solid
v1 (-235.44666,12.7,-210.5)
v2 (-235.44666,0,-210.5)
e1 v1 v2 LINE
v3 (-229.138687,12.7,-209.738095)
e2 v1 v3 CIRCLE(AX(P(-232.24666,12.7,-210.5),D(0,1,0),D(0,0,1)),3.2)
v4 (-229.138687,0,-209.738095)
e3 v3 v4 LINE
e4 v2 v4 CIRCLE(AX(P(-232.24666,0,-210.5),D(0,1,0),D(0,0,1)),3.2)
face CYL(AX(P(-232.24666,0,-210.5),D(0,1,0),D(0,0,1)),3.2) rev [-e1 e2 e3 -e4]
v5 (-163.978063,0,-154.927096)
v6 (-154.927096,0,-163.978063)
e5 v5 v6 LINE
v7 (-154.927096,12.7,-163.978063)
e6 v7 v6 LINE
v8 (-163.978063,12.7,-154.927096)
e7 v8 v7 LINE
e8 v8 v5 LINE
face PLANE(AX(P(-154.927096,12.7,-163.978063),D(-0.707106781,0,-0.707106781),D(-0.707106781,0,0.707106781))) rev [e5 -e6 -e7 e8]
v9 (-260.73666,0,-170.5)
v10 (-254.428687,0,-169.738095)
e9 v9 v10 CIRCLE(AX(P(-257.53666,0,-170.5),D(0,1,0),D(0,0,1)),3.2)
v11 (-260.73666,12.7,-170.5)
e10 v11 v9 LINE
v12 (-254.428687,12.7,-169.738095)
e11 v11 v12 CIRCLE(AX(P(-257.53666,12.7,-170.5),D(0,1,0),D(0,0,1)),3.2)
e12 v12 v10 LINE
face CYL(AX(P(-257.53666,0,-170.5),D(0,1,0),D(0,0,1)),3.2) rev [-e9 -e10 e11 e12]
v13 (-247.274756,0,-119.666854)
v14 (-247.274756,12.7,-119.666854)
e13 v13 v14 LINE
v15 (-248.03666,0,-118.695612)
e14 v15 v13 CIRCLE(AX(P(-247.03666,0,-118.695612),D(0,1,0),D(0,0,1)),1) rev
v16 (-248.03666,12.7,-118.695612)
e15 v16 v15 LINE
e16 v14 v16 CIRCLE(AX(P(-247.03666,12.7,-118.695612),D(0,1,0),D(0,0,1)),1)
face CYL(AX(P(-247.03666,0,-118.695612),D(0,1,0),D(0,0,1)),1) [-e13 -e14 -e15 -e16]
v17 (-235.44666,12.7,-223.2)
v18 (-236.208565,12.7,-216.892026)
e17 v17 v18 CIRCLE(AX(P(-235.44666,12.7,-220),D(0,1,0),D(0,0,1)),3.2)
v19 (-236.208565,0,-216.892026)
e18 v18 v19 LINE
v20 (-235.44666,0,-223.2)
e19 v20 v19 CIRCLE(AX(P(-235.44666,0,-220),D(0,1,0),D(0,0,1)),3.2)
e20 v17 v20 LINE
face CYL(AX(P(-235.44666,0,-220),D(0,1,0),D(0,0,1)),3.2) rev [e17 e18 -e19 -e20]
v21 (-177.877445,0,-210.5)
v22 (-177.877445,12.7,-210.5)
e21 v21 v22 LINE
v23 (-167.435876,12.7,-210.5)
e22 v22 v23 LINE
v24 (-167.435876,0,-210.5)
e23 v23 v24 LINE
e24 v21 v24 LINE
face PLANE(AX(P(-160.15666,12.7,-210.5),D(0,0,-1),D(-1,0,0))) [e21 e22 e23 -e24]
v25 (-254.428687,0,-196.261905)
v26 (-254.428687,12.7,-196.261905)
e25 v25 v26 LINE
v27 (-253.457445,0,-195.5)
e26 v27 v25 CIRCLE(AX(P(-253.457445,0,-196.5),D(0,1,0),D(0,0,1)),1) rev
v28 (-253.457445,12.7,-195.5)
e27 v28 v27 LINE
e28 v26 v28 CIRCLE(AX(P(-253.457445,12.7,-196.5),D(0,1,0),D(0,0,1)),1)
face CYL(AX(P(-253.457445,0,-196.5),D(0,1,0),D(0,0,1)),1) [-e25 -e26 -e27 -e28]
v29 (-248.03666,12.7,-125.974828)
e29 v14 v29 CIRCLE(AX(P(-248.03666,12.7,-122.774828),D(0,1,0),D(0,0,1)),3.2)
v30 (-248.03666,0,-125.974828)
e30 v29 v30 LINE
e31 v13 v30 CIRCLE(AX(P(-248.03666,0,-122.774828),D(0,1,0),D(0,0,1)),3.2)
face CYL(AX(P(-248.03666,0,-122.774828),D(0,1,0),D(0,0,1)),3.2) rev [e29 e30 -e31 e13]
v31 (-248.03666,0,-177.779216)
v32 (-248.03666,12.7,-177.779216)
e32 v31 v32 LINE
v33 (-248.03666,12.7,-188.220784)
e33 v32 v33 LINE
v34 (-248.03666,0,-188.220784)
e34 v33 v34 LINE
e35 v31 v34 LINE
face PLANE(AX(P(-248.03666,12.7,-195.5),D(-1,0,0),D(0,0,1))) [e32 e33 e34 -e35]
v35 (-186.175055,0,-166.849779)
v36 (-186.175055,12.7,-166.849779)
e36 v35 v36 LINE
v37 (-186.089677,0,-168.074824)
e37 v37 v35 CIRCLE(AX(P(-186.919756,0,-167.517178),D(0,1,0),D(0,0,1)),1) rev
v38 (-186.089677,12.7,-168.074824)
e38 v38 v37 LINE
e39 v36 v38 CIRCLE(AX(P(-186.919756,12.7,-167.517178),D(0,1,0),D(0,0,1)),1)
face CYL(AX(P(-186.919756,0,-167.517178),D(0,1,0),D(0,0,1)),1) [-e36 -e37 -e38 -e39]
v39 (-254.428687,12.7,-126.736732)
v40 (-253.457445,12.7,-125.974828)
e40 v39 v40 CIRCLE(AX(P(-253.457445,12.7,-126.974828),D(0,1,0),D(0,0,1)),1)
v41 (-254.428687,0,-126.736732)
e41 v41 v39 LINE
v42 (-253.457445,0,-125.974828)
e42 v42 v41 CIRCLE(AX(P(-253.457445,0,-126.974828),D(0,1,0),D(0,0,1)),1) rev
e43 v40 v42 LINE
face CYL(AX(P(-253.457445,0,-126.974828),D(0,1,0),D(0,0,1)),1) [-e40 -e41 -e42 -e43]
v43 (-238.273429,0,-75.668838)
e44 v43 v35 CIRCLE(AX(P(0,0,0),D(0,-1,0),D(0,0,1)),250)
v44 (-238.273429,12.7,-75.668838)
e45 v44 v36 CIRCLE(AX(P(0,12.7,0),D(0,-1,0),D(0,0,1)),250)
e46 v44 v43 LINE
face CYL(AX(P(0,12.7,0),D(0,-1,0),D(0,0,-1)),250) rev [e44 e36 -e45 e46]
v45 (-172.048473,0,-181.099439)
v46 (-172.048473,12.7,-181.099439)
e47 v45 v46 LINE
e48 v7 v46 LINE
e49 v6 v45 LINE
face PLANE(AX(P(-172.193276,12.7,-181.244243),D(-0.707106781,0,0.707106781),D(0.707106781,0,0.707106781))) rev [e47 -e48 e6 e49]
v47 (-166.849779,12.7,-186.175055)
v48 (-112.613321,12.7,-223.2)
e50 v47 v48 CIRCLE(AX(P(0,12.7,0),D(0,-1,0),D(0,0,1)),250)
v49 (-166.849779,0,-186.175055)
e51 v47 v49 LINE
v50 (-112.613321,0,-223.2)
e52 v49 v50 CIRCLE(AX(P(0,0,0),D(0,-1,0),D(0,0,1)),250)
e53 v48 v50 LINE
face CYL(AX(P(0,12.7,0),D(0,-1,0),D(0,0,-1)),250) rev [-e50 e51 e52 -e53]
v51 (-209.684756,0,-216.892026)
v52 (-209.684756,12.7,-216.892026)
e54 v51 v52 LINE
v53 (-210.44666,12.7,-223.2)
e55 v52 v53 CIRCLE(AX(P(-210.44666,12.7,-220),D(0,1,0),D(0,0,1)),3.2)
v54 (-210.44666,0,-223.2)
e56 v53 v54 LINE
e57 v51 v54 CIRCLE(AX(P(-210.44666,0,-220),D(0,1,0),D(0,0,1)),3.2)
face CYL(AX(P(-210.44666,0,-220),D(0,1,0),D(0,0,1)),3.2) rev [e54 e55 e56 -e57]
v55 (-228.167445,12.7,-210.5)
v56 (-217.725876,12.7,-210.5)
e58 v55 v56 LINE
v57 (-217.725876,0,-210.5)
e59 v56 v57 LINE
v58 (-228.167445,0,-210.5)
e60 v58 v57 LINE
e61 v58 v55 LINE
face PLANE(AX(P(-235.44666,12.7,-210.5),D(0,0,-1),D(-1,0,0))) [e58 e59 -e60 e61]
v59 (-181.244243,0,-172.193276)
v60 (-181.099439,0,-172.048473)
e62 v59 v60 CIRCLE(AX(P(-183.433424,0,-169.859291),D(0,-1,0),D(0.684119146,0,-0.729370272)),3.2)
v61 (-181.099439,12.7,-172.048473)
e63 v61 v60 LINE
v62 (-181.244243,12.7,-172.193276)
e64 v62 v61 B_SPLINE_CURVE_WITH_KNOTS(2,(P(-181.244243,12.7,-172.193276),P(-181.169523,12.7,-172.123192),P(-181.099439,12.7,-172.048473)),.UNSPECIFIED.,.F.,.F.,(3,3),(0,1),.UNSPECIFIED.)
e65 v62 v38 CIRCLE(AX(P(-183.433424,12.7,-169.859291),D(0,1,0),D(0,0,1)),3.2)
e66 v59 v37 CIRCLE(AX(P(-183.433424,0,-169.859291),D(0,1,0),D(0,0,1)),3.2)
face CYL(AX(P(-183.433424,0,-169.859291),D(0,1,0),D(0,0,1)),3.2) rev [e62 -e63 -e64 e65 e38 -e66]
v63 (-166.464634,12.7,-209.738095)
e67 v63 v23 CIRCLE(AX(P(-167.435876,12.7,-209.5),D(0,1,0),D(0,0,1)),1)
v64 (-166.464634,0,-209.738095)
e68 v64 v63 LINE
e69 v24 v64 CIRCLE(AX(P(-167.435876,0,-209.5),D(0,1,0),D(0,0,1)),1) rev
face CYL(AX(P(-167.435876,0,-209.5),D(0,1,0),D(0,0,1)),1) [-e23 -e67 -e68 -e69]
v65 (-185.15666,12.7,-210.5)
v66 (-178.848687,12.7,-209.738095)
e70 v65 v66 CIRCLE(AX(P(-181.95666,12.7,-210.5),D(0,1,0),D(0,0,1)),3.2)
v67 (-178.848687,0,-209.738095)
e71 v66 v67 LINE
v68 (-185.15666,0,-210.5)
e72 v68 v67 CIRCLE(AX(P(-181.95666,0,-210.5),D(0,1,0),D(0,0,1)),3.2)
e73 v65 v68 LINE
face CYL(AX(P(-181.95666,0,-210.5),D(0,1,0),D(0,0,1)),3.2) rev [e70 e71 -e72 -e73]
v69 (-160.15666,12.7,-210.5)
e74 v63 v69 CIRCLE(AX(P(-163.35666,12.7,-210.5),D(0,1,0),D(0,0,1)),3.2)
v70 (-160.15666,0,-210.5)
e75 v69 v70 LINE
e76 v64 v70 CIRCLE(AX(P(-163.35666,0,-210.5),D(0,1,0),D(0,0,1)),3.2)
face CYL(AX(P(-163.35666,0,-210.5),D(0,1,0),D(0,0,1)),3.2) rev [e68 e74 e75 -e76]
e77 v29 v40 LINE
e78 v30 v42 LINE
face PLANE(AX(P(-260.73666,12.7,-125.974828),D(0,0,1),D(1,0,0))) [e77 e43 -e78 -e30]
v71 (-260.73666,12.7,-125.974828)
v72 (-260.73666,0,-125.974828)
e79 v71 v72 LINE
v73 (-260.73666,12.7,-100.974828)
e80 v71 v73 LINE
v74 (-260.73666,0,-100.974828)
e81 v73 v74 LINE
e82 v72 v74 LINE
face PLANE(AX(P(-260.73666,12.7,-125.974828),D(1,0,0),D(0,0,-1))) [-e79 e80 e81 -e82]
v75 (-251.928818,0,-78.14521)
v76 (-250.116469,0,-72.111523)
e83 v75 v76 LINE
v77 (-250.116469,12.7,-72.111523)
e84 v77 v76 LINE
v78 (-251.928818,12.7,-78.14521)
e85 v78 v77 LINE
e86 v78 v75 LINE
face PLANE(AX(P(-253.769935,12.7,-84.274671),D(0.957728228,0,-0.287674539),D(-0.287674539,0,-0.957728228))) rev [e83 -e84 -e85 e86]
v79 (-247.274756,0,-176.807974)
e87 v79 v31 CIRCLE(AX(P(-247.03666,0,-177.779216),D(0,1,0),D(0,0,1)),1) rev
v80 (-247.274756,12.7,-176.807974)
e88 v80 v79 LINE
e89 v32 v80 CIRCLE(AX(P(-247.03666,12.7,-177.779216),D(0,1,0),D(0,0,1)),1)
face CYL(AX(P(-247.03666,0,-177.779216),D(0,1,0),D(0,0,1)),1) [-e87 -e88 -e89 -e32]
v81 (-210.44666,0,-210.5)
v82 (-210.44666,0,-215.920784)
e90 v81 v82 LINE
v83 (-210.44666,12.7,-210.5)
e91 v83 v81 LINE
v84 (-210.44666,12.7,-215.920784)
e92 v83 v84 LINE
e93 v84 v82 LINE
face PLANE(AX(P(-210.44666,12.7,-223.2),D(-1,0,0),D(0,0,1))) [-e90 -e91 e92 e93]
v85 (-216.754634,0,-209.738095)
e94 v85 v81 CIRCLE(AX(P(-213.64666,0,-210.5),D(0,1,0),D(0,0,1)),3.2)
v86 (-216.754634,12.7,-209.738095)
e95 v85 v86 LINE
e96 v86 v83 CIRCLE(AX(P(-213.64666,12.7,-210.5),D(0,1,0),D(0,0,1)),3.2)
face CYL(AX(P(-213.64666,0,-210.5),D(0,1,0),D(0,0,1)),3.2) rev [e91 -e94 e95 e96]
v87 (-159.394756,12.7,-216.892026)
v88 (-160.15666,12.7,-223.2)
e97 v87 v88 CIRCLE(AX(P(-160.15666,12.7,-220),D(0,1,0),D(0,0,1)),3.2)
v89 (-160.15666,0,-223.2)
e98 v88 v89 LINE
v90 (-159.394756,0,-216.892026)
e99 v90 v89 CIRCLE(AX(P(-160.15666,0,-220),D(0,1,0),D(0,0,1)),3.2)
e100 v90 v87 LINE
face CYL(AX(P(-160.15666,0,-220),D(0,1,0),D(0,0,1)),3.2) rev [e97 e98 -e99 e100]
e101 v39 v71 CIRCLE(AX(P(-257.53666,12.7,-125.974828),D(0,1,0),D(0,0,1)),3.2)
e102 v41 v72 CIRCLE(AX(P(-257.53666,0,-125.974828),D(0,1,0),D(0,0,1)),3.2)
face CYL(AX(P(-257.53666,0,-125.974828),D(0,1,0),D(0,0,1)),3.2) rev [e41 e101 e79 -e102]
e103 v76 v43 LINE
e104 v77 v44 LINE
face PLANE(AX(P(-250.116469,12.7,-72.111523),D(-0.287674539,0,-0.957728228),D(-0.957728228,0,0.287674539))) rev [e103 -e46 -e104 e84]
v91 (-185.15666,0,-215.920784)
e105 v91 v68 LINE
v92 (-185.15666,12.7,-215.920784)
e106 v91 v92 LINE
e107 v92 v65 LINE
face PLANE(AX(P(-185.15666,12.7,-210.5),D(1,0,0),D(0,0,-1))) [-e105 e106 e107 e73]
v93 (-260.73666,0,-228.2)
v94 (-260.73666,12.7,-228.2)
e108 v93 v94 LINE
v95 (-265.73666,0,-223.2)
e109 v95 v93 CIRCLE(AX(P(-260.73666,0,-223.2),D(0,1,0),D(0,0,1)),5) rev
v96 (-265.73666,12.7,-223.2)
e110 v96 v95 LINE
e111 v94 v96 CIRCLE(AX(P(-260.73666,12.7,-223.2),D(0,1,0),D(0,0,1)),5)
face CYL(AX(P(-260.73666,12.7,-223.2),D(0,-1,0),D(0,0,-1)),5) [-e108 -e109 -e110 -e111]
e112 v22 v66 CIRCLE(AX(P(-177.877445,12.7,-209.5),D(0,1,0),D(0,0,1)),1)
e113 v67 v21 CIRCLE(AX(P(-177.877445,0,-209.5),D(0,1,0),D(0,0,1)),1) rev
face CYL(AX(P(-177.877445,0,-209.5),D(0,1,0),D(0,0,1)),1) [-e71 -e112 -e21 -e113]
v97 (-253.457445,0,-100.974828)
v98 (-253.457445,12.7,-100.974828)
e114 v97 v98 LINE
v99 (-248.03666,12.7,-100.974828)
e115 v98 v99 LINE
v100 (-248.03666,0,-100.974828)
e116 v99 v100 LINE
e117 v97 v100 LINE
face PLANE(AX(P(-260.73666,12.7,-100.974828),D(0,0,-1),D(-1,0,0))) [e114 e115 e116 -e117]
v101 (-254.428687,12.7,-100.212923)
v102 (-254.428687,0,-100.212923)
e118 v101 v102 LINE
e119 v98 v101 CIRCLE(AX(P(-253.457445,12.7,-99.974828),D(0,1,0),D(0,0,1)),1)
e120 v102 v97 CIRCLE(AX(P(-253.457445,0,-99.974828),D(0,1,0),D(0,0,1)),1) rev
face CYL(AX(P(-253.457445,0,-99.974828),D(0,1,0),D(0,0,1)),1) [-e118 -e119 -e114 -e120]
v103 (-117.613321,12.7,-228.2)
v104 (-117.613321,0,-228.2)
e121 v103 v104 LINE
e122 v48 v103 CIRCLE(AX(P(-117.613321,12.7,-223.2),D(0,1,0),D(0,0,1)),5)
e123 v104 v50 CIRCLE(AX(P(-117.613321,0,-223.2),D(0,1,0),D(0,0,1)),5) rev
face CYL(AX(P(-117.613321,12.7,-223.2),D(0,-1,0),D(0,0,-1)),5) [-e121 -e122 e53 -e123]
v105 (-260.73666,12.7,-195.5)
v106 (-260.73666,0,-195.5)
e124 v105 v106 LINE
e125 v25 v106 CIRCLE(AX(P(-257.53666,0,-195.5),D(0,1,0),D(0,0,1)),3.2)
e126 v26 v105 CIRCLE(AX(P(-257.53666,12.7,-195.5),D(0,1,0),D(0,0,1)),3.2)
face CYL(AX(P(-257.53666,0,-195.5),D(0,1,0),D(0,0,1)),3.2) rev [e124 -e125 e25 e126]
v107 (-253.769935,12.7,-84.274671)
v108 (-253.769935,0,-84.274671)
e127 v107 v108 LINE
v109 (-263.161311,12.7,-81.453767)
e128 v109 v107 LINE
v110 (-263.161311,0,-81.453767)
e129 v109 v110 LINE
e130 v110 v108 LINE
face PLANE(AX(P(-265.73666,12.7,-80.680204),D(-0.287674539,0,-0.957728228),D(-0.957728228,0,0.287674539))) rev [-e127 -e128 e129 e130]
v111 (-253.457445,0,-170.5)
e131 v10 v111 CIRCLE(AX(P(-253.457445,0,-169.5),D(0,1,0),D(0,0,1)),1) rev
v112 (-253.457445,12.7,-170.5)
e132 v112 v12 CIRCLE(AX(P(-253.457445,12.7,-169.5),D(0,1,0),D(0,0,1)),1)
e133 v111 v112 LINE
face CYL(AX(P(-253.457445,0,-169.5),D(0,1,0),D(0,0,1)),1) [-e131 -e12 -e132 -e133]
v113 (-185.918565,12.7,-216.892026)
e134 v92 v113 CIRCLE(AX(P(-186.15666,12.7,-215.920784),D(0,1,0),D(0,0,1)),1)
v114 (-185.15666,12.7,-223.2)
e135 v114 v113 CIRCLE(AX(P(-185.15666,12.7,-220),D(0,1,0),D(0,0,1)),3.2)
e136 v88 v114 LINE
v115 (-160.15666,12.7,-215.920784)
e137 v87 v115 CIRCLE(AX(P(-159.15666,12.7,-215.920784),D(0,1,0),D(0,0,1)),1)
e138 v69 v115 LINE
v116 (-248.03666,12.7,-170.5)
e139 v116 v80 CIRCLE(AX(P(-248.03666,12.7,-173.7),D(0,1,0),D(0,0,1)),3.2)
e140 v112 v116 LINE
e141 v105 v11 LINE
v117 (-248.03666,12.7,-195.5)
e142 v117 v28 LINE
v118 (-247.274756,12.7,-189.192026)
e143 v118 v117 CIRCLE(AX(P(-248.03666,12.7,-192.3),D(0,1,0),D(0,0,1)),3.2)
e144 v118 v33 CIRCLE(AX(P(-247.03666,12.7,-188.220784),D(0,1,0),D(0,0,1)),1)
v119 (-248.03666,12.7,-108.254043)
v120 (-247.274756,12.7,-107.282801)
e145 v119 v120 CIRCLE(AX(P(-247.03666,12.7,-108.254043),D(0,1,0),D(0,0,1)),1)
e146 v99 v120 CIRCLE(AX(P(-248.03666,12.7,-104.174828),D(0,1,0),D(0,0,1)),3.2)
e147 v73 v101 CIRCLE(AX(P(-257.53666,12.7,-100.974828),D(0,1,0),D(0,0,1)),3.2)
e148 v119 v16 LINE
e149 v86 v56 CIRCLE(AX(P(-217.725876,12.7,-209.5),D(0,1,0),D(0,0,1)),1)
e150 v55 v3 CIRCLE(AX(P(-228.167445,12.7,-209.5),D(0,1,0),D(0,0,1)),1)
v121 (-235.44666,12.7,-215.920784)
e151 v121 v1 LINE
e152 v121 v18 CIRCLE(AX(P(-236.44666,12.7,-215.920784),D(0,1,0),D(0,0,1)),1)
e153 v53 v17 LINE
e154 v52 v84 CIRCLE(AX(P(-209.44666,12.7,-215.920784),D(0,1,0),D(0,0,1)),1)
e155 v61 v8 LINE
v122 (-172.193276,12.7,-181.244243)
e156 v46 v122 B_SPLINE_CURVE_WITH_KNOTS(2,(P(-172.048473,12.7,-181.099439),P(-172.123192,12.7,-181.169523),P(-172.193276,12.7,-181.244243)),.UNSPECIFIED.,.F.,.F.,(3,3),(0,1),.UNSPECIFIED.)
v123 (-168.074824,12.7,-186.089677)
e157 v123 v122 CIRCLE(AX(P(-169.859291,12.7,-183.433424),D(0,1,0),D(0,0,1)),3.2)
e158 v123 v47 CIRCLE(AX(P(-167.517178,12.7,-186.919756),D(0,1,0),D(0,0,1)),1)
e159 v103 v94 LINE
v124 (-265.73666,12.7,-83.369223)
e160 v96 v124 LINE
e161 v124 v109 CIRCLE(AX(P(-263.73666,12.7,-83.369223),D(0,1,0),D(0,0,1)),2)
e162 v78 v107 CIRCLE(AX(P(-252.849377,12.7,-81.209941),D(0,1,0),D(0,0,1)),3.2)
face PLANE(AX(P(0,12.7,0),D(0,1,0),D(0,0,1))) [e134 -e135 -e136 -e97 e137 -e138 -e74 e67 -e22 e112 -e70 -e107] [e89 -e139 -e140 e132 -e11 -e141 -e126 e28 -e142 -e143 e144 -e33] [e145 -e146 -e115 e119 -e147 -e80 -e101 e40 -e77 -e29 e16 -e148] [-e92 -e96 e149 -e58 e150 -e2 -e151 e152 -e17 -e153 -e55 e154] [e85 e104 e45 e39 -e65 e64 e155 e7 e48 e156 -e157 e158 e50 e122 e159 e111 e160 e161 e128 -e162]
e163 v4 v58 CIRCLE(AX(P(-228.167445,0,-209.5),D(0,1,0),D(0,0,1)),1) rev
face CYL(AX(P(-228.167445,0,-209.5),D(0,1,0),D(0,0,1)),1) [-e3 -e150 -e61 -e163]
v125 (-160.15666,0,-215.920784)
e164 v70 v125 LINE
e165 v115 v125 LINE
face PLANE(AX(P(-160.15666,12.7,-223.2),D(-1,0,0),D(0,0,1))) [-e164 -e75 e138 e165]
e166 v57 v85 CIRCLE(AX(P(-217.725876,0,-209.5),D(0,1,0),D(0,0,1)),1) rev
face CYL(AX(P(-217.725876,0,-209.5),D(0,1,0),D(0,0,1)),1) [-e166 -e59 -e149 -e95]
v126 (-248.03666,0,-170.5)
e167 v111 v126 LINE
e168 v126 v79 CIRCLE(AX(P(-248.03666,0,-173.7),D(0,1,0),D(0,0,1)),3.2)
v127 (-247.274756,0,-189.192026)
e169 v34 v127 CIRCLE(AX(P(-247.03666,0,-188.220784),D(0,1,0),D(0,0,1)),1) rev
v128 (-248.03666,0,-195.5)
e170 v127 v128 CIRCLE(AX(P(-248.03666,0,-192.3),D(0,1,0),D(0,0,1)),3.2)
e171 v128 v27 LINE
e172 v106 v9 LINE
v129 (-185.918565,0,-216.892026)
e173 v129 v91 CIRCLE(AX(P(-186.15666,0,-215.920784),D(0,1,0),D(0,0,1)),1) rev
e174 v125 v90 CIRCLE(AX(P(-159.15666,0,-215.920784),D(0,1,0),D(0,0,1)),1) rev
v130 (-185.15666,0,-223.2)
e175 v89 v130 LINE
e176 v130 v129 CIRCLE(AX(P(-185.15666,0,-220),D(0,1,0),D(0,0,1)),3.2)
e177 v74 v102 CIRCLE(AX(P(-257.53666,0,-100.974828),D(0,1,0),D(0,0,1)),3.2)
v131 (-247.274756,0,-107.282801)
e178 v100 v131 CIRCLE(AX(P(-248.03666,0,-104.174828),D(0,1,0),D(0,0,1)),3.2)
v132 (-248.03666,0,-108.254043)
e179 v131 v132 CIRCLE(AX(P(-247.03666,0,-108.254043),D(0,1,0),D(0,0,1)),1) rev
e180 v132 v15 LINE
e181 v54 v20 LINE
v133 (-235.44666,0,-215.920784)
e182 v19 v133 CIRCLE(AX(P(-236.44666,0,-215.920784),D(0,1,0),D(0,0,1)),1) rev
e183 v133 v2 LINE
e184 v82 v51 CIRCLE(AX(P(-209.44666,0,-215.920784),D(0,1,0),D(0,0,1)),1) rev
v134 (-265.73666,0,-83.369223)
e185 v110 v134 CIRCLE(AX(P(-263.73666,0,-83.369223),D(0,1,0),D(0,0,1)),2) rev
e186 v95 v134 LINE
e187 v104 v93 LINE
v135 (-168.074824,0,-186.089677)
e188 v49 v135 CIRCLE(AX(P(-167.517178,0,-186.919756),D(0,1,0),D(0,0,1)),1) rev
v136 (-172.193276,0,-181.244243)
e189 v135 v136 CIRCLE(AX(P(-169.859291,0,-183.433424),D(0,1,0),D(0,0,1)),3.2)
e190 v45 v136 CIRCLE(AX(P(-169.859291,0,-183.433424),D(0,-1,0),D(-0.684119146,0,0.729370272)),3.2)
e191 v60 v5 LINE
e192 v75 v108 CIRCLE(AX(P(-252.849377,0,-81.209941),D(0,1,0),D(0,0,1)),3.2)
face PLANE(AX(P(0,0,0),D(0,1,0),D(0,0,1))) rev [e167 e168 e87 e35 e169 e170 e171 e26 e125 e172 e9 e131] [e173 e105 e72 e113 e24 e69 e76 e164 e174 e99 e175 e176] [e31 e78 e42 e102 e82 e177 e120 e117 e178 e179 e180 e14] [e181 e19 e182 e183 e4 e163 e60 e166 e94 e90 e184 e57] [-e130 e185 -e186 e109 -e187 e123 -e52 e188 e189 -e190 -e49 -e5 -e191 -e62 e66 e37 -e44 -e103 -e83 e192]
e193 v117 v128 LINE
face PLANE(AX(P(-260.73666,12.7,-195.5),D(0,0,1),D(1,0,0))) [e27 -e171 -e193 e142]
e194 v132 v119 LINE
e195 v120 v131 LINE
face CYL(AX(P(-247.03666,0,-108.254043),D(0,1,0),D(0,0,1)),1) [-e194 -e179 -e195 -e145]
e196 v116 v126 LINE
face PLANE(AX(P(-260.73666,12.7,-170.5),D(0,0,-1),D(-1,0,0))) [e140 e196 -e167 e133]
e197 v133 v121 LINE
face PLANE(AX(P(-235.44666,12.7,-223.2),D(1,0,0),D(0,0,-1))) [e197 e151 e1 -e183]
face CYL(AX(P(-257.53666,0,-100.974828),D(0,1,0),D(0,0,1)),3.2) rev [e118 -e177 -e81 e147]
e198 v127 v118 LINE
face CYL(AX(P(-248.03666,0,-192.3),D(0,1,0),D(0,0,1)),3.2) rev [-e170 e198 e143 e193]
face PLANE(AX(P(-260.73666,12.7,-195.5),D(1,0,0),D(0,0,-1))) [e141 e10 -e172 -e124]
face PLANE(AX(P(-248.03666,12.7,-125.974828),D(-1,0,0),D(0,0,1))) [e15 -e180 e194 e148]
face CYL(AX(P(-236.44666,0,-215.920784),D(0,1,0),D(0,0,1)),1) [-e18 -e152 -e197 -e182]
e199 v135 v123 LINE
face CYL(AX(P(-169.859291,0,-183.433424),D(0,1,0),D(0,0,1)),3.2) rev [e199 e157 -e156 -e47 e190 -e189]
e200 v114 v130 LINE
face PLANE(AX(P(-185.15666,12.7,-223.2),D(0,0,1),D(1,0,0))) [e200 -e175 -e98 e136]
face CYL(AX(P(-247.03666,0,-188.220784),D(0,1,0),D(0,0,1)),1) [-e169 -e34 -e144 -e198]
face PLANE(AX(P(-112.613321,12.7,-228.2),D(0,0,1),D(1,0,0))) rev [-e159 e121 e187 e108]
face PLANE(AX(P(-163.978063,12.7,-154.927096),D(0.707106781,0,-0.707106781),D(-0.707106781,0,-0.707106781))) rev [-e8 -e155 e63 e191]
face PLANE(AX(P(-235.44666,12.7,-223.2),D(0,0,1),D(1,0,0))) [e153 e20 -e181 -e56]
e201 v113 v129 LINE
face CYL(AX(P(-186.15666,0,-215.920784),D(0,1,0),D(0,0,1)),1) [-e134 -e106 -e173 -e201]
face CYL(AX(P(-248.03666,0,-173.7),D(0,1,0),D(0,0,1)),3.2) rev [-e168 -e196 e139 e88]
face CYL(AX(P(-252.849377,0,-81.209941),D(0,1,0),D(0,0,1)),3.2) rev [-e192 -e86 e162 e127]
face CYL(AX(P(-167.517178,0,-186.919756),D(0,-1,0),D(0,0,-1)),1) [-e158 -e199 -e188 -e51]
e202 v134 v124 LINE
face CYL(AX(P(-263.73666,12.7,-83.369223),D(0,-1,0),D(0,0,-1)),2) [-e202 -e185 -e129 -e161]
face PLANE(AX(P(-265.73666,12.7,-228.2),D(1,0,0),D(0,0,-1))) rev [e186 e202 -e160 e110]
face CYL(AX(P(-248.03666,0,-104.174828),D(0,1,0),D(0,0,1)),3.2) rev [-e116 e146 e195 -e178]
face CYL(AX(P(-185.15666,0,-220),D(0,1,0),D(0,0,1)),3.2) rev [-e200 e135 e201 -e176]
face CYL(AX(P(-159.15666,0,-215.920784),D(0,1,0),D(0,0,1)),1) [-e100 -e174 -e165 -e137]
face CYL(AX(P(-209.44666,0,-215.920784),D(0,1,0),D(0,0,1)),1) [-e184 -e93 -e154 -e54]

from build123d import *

# Parameters (mm, degrees)
SKETCH1_W           = 25
SKETCH1_H           = 12.7
SKETCH1_W_2         = 12.7
SKETCH1_H_2         = 25
BOSS_EXTRUDE1_DEPTH = 12.7
SKETCH2_R           = 3.2
CUT_EXTRUDE1_DEPTH  = 351.503213473
FILLET1_R           = 5
FILLET2_R           = 1
FILLET3_R           = 2


with BuildPart() as part:
    # Sketch1 → Boss-Extrude1 (new body)
    with BuildSketch(Plane(origin=(0, 0, 0), x_dir=(1, 0, 0), z_dir=(0, 1, 0))):
        with BuildLine():
            Line((-172.193276216, 181.244243015), (-154.927095758, 163.978062557))
            Line((-154.927095758, 163.978062557), (-163.978062557, 154.927095758))
            Line((-163.978062557, 154.927095758), (-181.244243015, 172.193276216))
            ThreePointArc((-181.244243015, 172.193276216), (-215.239427447, 127.169134904), (-238.273429132, 75.668837508))
            Line((-238.273429132, 75.668837508), (-250.116468804, 72.111522519))
            Line((-250.116468804, 72.111522519), (-253.769935453, 84.27467102))
            Line((-253.769935453, 84.27467102), (-265.736660352, 80.680204478))
            Line((-265.736660352, 80.680204478), (-265.736660352, 228.2))
            Line((-265.736660352, 228.2), (-112.613320704, 228.2))
            Line((-112.613320704, 228.2), (-112.613320704, 223.2))
            ThreePointArc((-112.613320704, 223.2), (-143.940163951, 204.40457236), (-172.193276216, 181.244243015))
        make_face()
        with Locations((-172.656660352, 216.85)):
            Rectangle(SKETCH1_W, SKETCH1_H, mode=Mode.SUBTRACT)
        with Locations((-222.946660352, 216.85)):
            Rectangle(SKETCH1_W, SKETCH1_H, mode=Mode.SUBTRACT)
        with Locations((-254.386660352, 183)):
            Rectangle(SKETCH1_W_2, SKETCH1_H_2, mode=Mode.SUBTRACT)
        with Locations((-254.386660352, 113.474827547)):
            Rectangle(SKETCH1_W_2, SKETCH1_H_2, mode=Mode.SUBTRACT)
    extrude(amount=BOSS_EXTRUDE1_DEPTH)

    # Sketch2 → Cut-Extrude1 (cut, through all)
    with BuildSketch(Plane(origin=(0, 12.7, 0), x_dir=(1, 0, 0), z_dir=(0, 1, 0))):
        with Locations((-169.859291345, 183.433424282)):
            Circle(SKETCH2_R)
        with Locations((-183.433424282, 169.859291345)):
            Circle(SKETCH2_R)
        with Locations((-181.956660352, 210.5)):
            Circle(SKETCH2_R)
        with Locations((-163.356660352, 210.5)):
            Circle(SKETCH2_R)
        with Locations((-160.156660352, 220)):
            Circle(SKETCH2_R)
        with Locations((-185.156660352, 220)):
            Circle(SKETCH2_R)
        with Locations((-210.446660352, 220)):
            Circle(SKETCH2_R)
        with Locations((-213.646660352, 210.5)):
            Circle(SKETCH2_R)
        with Locations((-232.246660352, 210.5)):
            Circle(SKETCH2_R)
        with Locations((-235.446660352, 220)):
            Circle(SKETCH2_R)
        with Locations((-257.536660352, 195.5)):
            Circle(SKETCH2_R)
        with Locations((-248.036660352, 192.3)):
            Circle(SKETCH2_R)
        with Locations((-248.036660352, 173.7)):
            Circle(SKETCH2_R)
        with Locations((-257.536660352, 170.5)):
            Circle(SKETCH2_R)
        with Locations((-257.536660352, 125.974827547)):
            Circle(SKETCH2_R)
        with Locations((-257.536660352, 100.974827547)):
            Circle(SKETCH2_R)
        with Locations((-248.036660352, 104.174827547)):
            Circle(SKETCH2_R)
        with Locations((-248.036660352, 122.774827547)):
            Circle(SKETCH2_R)
        with Locations((-252.849376927, 81.209940689)):
            Circle(SKETCH2_R)
    extrude(amount=-CUT_EXTRUDE1_DEPTH, mode=Mode.SUBTRACT)

    # Fillet1
    fillet1_edges = [part.edges().sort_by_distance(p)[0] for p in [
        (-112.613320704, 6.35, -228.2),
        (-265.736660352, 6.35, -228.2),
    ]]
    fillet(fillet1_edges, radius=FILLET1_R - 0.0001)  # a hair under: the kernel refuses the full size

    # Fillet2
    fillet2_edges = [part.edges().sort_by_distance(p)[0] for p in [
        (-167.497476727, 6.35, -185.592551817),
        (-185.592551817, 6.35, -167.497476727),
        (-248.036660352, 6.35, -107.374827547),
        (-254.336660352, 6.35, -100.974827547),
        (-254.336660352, 6.35, -125.974827547),
        (-248.036660352, 6.35, -119.574827547),
        (-216.846660352, 6.35, -210.5),
        (-229.046660352, 6.35, -210.5),
        (-235.446660352, 6.35, -216.8),
        (-160.156660352, 6.35, -216.8),
        (-166.556660352, 6.35, -210.5),
        (-178.756660352, 6.35, -210.5),
        (-185.156660352, 6.35, -216.8),
        (-210.446660352, 6.35, -216.8),
        (-248.036660352, 6.35, -189.1),
        (-248.036660352, 6.35, -176.9),
        (-254.336660352, 6.35, -170.5),
        (-254.336660352, 6.35, -195.5),
    ]]
    fillet(fillet2_edges, radius=FILLET2_R)

    # Fillet3
    fillet3_edges = [part.edges().sort_by_distance(p)[0] for p in [
        (-265.736660352, 6.35, -80.680204478),
    ]]
    fillet(fillet3_edges, radius=FILLET3_R)


solid = part.part
